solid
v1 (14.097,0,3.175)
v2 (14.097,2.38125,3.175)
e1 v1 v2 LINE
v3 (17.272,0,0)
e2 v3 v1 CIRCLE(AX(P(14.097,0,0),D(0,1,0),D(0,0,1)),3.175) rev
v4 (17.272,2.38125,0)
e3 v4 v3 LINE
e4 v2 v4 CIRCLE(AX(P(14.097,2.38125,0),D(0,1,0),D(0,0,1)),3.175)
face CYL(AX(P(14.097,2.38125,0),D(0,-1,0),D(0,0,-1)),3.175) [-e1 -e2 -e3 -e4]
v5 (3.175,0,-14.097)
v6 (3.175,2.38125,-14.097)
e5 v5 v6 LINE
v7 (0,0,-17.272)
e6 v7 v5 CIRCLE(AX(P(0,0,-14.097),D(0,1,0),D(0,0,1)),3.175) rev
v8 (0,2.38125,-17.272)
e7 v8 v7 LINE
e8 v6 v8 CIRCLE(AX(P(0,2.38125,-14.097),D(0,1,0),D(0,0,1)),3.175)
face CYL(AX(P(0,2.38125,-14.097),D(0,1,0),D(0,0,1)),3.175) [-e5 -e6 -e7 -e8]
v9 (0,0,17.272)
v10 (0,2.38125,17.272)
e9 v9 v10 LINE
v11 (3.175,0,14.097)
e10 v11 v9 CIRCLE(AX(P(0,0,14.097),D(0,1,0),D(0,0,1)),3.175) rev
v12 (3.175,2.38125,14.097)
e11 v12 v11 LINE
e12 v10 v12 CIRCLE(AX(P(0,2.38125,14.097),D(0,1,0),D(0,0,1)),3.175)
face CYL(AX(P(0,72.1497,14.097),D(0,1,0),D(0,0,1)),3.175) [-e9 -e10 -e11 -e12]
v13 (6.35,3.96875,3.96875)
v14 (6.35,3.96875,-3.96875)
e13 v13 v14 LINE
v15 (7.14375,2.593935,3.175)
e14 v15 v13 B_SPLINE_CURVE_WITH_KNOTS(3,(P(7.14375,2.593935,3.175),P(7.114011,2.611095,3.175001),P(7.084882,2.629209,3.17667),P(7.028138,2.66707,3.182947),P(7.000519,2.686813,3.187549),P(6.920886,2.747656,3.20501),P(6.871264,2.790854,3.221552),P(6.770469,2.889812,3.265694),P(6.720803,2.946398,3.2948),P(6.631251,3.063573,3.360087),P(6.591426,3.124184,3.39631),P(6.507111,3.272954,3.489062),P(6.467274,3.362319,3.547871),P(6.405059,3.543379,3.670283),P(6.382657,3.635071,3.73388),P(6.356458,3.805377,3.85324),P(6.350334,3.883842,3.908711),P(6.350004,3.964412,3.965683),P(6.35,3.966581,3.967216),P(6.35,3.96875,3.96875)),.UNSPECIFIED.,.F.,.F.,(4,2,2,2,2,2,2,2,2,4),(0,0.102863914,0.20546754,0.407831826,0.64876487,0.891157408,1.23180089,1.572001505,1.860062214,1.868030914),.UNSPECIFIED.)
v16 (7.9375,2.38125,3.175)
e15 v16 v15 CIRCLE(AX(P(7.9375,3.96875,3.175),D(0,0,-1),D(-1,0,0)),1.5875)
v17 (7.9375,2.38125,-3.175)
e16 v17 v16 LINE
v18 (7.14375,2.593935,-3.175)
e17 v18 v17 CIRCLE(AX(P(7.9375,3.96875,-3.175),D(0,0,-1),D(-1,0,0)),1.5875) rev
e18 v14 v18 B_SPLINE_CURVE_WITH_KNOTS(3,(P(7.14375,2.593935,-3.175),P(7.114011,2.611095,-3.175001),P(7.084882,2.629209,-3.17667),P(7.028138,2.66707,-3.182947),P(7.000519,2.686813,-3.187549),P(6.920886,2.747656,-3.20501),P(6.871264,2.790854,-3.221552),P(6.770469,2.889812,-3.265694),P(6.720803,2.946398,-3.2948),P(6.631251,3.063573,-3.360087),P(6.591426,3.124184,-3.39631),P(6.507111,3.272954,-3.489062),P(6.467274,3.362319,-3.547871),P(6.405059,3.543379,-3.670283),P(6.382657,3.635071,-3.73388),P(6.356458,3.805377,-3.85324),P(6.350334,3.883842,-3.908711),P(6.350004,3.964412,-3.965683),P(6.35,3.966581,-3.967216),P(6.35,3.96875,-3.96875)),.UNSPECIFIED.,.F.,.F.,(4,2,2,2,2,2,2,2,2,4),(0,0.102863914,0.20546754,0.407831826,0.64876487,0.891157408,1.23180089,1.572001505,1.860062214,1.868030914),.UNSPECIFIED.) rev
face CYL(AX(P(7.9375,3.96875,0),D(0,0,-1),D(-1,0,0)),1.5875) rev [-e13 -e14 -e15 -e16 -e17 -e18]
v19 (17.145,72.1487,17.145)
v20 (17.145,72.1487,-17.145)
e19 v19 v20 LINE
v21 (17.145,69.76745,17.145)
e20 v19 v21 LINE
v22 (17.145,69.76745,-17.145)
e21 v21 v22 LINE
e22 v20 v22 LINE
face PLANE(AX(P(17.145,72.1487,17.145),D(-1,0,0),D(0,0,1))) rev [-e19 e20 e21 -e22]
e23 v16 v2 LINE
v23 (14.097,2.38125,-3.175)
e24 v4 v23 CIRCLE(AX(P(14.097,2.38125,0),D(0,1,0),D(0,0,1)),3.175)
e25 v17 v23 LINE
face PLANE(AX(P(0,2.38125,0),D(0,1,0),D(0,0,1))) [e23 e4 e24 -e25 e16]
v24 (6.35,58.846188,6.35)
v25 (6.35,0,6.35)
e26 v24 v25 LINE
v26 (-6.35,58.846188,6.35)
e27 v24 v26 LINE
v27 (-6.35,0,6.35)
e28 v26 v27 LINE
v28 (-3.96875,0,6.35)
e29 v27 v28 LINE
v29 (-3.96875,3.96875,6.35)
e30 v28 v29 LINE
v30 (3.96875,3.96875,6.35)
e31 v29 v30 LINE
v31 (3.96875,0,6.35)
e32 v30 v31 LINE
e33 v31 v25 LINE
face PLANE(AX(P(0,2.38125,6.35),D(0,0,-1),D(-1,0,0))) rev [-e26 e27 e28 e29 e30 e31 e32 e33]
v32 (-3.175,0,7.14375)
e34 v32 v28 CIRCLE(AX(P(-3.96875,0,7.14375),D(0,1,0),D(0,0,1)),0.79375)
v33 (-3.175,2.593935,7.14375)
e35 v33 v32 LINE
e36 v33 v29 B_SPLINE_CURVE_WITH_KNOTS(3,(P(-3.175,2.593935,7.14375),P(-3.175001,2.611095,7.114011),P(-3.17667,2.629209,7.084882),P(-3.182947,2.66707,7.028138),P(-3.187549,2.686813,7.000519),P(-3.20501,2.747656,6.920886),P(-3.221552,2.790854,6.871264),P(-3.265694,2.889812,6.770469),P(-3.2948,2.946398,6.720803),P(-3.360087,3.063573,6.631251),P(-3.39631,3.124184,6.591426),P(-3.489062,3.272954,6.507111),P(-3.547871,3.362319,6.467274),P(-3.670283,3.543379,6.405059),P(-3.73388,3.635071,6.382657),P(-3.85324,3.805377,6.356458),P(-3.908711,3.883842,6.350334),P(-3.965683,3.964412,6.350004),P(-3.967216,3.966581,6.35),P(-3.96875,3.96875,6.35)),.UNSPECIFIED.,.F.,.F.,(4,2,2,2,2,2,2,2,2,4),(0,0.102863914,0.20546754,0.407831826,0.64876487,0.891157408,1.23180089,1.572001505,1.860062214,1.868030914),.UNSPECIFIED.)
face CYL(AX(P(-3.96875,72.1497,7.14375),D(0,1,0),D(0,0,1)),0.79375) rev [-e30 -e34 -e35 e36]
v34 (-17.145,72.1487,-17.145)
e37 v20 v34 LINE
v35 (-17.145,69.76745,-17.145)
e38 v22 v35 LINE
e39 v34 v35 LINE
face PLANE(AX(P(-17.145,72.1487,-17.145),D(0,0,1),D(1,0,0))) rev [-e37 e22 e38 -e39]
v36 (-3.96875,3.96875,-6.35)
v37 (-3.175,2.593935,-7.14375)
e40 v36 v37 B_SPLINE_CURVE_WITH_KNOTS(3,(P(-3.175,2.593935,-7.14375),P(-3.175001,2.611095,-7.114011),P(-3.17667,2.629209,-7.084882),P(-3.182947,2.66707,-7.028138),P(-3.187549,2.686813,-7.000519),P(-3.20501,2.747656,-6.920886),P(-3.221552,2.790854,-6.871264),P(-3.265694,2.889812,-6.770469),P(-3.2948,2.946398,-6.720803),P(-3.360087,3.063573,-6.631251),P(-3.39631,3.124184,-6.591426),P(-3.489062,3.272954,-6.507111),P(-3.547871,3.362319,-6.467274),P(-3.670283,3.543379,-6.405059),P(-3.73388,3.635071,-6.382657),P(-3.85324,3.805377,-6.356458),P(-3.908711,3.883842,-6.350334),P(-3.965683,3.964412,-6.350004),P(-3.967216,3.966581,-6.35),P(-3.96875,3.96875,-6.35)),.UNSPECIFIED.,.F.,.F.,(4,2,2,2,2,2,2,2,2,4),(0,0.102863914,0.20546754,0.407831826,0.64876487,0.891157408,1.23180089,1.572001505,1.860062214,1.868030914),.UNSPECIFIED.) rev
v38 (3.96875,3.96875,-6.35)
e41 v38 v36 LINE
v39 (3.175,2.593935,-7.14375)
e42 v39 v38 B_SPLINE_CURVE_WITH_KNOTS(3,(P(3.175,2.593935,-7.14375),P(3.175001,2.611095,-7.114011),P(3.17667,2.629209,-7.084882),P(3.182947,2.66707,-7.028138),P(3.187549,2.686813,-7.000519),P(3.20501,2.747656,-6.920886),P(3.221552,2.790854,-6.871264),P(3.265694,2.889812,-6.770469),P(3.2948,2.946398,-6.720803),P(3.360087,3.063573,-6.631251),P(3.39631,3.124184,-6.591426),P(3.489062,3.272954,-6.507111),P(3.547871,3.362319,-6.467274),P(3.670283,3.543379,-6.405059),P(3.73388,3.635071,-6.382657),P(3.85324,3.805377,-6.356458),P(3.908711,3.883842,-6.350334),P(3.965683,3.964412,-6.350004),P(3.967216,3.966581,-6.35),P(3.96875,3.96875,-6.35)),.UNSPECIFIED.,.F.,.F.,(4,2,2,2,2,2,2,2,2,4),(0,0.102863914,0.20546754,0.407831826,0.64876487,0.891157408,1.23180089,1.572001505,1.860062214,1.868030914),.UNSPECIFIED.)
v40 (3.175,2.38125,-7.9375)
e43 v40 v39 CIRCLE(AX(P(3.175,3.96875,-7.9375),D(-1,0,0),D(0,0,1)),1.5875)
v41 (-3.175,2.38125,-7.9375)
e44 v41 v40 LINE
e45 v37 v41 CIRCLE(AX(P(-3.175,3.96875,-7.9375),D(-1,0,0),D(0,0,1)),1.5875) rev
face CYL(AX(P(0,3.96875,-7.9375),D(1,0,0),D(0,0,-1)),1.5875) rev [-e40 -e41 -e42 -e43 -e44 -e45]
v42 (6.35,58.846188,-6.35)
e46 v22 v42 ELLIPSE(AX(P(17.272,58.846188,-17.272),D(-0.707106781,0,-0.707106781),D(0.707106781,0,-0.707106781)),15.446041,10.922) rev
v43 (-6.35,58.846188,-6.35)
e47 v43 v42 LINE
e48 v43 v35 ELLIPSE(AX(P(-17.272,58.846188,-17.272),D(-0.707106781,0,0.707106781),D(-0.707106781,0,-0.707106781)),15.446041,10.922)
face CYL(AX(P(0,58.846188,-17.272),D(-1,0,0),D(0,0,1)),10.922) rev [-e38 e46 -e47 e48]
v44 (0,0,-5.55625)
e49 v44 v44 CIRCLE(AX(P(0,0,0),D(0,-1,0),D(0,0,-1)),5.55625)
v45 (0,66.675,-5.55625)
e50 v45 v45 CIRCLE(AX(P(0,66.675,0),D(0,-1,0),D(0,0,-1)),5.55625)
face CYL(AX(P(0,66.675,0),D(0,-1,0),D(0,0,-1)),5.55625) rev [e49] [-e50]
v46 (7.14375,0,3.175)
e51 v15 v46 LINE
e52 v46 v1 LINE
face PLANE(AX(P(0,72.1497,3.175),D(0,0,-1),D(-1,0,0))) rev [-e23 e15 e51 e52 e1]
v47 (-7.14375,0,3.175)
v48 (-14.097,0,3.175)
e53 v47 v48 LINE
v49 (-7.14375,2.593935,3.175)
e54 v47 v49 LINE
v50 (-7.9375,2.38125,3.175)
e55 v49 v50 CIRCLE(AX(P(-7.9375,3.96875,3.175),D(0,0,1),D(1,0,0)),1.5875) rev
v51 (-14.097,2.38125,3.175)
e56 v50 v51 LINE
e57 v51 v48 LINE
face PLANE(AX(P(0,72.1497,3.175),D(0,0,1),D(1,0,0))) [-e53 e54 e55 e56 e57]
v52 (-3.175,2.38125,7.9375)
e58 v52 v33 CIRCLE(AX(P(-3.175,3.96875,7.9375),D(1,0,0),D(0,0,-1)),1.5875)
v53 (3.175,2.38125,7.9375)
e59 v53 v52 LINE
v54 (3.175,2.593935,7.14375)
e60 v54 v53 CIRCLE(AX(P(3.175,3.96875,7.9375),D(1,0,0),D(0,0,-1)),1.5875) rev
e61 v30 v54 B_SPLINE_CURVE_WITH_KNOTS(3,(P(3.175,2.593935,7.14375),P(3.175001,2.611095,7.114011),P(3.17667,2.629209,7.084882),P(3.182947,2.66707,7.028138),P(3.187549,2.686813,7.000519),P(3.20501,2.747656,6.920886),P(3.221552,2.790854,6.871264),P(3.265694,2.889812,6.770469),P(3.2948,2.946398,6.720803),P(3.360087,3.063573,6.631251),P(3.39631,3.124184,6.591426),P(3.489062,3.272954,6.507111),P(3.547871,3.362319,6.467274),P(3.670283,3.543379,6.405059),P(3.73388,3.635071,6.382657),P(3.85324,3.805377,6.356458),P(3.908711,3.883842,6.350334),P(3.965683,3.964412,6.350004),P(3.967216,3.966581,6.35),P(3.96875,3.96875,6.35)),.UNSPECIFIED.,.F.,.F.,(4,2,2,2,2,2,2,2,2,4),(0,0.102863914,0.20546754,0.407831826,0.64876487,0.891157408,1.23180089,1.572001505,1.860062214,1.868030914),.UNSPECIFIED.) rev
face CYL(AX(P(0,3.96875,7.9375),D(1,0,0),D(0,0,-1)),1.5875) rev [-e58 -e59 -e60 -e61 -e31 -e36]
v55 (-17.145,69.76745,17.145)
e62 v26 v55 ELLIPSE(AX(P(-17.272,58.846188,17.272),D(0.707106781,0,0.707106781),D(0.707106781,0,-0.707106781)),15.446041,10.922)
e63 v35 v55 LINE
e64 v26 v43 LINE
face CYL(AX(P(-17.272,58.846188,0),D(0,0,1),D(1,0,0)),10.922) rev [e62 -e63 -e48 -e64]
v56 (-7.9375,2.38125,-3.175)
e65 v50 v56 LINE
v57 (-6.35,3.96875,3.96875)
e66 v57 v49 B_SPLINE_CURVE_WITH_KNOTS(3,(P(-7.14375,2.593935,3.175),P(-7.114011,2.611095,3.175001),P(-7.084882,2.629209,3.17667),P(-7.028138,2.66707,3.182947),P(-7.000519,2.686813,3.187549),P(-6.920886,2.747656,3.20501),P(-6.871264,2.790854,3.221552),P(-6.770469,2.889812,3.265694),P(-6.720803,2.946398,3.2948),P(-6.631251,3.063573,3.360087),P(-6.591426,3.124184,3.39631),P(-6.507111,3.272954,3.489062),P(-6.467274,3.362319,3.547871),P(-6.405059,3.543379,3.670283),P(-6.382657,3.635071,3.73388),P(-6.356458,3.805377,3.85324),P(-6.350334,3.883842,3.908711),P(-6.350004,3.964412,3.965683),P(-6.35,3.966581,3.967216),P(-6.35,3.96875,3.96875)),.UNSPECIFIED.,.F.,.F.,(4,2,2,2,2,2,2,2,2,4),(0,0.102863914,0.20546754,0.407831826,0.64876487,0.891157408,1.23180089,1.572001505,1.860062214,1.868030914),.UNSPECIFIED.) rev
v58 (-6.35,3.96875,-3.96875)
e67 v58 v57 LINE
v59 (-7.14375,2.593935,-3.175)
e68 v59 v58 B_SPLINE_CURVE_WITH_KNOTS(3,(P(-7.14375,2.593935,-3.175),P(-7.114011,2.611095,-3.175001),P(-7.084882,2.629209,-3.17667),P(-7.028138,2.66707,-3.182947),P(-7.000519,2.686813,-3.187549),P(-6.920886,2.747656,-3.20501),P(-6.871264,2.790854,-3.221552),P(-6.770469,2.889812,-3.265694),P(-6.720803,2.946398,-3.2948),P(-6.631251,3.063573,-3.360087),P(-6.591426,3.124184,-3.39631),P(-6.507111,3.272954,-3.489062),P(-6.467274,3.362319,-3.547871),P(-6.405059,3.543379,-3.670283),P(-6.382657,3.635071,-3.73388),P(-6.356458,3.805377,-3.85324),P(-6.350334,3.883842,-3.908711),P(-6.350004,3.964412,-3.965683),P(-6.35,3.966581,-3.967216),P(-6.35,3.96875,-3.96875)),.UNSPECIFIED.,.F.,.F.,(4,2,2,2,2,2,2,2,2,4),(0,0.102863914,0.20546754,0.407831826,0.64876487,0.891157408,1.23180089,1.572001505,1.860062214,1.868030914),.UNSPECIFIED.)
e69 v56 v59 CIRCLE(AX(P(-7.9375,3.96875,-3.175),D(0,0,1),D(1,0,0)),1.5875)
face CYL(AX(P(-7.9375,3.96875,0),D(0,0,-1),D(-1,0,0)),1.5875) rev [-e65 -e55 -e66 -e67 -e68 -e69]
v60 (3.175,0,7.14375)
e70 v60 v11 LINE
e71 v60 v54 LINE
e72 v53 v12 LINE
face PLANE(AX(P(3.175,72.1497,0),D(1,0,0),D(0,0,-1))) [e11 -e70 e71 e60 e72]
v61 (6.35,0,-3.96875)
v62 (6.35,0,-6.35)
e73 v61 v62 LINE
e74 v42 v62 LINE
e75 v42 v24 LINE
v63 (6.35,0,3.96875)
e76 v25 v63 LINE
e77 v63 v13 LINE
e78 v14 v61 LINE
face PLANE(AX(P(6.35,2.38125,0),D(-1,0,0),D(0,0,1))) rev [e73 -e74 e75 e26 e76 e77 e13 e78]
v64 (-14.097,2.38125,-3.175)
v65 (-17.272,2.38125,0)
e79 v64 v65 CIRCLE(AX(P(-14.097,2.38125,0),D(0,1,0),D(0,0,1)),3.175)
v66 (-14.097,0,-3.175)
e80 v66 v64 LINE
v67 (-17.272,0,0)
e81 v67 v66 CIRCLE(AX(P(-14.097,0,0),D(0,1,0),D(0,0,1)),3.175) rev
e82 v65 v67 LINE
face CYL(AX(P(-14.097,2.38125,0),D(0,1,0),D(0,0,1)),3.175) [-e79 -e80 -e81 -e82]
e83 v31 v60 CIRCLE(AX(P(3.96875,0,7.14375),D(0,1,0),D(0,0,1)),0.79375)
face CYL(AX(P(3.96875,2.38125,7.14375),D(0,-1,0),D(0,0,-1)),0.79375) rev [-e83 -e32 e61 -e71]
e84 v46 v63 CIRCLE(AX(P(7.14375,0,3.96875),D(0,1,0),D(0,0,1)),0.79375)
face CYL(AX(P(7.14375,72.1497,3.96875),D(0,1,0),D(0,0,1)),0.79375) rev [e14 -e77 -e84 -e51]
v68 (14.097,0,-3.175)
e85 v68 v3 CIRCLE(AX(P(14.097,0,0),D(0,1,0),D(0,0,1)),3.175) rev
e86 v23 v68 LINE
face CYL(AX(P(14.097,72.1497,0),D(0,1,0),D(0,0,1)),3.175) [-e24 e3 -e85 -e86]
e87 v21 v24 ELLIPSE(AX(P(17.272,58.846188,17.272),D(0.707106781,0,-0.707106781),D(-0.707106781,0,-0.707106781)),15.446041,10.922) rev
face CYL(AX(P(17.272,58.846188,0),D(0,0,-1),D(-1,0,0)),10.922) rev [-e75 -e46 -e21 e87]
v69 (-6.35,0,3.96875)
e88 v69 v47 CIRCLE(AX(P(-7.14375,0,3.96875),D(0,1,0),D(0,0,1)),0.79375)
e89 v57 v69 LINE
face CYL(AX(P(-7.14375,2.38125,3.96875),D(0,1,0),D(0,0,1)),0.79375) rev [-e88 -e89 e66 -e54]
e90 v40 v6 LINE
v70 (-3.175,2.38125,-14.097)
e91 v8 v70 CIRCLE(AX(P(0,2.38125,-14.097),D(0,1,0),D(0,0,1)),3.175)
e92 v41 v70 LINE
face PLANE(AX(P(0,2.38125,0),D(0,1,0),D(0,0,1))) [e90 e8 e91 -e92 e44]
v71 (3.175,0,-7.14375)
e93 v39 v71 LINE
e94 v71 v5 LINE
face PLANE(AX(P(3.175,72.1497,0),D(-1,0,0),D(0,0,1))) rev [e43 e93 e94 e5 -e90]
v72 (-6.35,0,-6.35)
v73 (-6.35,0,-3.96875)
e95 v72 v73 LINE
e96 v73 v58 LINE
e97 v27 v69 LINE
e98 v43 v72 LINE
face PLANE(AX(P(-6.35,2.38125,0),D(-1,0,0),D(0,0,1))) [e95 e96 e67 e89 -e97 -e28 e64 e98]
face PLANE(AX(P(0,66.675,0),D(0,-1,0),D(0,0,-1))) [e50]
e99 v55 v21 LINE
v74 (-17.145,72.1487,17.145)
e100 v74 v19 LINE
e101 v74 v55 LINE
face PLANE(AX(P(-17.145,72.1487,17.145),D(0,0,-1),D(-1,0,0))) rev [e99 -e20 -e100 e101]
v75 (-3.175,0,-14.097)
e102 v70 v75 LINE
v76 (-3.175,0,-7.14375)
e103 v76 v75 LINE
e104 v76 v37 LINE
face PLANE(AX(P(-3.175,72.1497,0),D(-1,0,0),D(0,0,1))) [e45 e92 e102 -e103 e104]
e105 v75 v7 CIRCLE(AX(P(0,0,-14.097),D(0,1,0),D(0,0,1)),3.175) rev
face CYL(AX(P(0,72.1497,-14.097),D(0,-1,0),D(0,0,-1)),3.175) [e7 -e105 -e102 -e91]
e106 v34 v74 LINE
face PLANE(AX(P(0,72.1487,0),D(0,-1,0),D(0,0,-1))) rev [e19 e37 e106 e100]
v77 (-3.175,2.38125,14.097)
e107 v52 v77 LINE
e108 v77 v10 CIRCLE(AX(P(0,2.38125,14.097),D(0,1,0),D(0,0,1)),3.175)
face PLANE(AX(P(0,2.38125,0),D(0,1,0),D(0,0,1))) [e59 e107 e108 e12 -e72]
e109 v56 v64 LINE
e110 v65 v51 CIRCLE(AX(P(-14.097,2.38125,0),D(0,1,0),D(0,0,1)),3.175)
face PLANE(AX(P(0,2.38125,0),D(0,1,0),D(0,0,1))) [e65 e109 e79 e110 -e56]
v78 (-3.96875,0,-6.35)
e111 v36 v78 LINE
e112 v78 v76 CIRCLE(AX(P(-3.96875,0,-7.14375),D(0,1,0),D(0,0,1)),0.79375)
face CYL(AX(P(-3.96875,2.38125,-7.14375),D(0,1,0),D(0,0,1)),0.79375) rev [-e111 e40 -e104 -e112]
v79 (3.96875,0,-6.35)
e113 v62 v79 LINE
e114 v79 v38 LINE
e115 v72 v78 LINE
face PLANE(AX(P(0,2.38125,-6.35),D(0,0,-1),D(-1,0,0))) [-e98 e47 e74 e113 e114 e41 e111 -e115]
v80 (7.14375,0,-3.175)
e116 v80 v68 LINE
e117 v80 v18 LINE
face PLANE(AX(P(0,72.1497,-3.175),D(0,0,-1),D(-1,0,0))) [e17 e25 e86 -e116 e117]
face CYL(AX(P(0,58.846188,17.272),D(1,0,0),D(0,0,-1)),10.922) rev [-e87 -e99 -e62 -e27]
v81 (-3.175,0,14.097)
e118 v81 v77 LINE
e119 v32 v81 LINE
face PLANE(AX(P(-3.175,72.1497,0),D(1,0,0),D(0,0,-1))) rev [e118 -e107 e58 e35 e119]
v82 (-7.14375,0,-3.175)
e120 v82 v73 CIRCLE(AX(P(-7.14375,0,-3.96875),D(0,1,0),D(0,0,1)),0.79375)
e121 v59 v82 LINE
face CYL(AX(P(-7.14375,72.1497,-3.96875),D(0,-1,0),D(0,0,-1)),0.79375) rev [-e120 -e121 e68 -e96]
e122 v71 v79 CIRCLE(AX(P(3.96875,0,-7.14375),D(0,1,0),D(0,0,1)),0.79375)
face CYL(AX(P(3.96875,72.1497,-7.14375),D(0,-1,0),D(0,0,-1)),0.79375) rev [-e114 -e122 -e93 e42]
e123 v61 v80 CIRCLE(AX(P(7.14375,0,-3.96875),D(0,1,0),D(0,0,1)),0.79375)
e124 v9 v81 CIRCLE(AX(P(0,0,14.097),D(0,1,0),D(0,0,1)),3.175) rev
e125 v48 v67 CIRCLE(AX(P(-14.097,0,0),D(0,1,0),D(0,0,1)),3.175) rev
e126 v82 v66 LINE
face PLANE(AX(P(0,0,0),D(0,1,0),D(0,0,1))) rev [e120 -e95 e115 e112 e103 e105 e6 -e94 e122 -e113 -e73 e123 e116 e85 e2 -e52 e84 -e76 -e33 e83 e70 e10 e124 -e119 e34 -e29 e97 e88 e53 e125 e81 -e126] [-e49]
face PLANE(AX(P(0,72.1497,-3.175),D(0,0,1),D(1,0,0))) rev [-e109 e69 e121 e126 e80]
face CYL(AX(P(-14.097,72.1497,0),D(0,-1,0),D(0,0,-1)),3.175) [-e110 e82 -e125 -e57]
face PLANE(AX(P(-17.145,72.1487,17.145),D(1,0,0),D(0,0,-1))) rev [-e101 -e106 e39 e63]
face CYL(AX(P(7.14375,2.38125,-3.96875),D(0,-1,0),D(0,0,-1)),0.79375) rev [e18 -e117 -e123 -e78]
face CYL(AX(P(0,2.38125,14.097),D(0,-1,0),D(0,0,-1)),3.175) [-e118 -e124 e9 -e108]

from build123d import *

# Parameters (mm, degrees)
SKETCH1_W           = 10.922
SKETCH1_H           = 12.7
SKETCH1_W_2         = 12.7
SKETCH1_H_2         = 10.922
BOSS_EXTRUDE1_DEPTH = 2.38125
SKETCH2_W           = 12.7
SKETCH2_H           = 12.7
BOSS_EXTRUDE2_DEPTH = 67.3862
SKETCH3_W           = 34.29
SKETCH3_H           = 34.29
BOSS_EXTRUDE3_DEPTH = 2.38125
FILLET15_R          = 10.922
SKETCH4_R           = 5.55625
CUT_EXTRUDE1_DEPTH  = 66.675
CUT_EXTRUDE2_REACH  = 78.171
SKETCH5_W           = 10.922
SKETCH5_H           = 3.175
SKETCH5_W_2         = 3.175
SKETCH5_H_2         = 10.922
FILLET18_R          = 3.175
FILLET28_R          = 0.79375
FILLET29_R          = 1.5875


# Some blends are built 0.0001 mm under size
with BuildPart() as part:
    # Sketch1 → Boss-Extrude1 (new body)
    with BuildSketch(Plane(origin=(0, 0, 0), x_dir=(1, 0, 0), z_dir=(0, 1, 0))):
        with Locations((-11.811, 0)):
            Rectangle(SKETCH1_W, SKETCH1_H)
        Rectangle(SKETCH1_W_2, SKETCH1_H)
        with Locations((0, 11.811)):
            Rectangle(SKETCH1_W_2, SKETCH1_H_2)
        with Locations((11.811, 0)):
            Rectangle(SKETCH1_W, SKETCH1_H)
        with Locations((0, -11.811)):
            Rectangle(SKETCH1_W_2, SKETCH1_H_2)
    extrude(amount=BOSS_EXTRUDE1_DEPTH)

    # Sketch2 → Boss-Extrude2 (add)
    with BuildSketch(Plane(origin=(0, 2.38125, 0), x_dir=(1, 0, 0), z_dir=(0, 1, 0))):
        Rectangle(SKETCH2_W, SKETCH2_H)
    extrude(amount=BOSS_EXTRUDE2_DEPTH)

    # Sketch3 → Boss-Extrude3 (add)
    with BuildSketch(Plane(origin=(0, 69.76745, 0), x_dir=(1, 0, 0), z_dir=(0, 1, 0))):
        Rectangle(SKETCH3_W, SKETCH3_H)
    extrude(amount=BOSS_EXTRUDE3_DEPTH)

    # Fillet15
    # the kernel refuses this fillet: 10.922 mm, written as the material it adds along each edge
    with BuildSketch(Plane(origin=(6.35, 69.76745, 6.35), x_dir=(1, 0, 0), z_dir=(0, 0, -1))) as fillet15_piece_1_section:
        with BuildLine():
            CenterArc((FILLET15_R, FILLET15_R), FILLET15_R, 180, 90)
            Line((0, FILLET15_R), (0, 0))
            Line((0, 0), (FILLET15_R, 0))
        make_face()
    fillet15_piece_1 = extrude(amount=12.7, mode=Mode.PRIVATE)
    fillet15_piece_1 = split(fillet15_piece_1, bisect_by=Plane(origin=(17.145, 67.292403203, 0), z_dir=(-1, 0, 0)), keep=Keep.TOP, mode=Mode.PRIVATE)
    add(fillet15_piece_1)
    with BuildSketch(Plane(origin=(6.35, 69.76745, -6.35), x_dir=(0, 0, -1), z_dir=(-1, 0, 0))) as fillet15_piece_2_section:
        with BuildLine():
            CenterArc((FILLET15_R, FILLET15_R), FILLET15_R, 180, 90)
            Line((0, FILLET15_R), (0, 0))
            Line((0, 0), (FILLET15_R, 0))
        make_face()
    fillet15_piece_2 = extrude(amount=12.7, mode=Mode.PRIVATE)
    fillet15_piece_2 = split(fillet15_piece_2, bisect_by=Plane(origin=(0, 67.292403203, -17.145), z_dir=(0, 0, 1)), keep=Keep.TOP, mode=Mode.PRIVATE)
    add(fillet15_piece_2)
    with BuildSketch(Plane(origin=(-6.35, 69.76745, -6.35), x_dir=(-1, 0, 0), z_dir=(0, 0, 1))) as fillet15_piece_3_section:
        with BuildLine():
            CenterArc((FILLET15_R, FILLET15_R), FILLET15_R, 180, 90)
            Line((0, FILLET15_R), (0, 0))
            Line((0, 0), (FILLET15_R, 0))
        make_face()
    fillet15_piece_3 = extrude(amount=12.7, mode=Mode.PRIVATE)
    fillet15_piece_3 = split(fillet15_piece_3, bisect_by=Plane(origin=(-17.145, 67.292403203, 0), z_dir=(1, 0, 0)), keep=Keep.TOP, mode=Mode.PRIVATE)
    add(fillet15_piece_3)
    with BuildSketch(Plane(origin=(-6.35, 69.76745, 6.35), x_dir=(0, 0, 1), z_dir=(1, 0, 0))) as fillet15_piece_4_section:
        with BuildLine():
            CenterArc((FILLET15_R, FILLET15_R), FILLET15_R, 180, 90)
            Line((0, FILLET15_R), (0, 0))
            Line((0, 0), (FILLET15_R, 0))
        make_face()
    fillet15_piece_4 = extrude(amount=12.7, mode=Mode.PRIVATE)
    fillet15_piece_4 = split(fillet15_piece_4, bisect_by=Plane(origin=(0, 67.292403203, 17.145), z_dir=(0, 0, -1)), keep=Keep.TOP, mode=Mode.PRIVATE)
    add(fillet15_piece_4)
    with BuildSketch(Plane(origin=(-6.35, 69.76745, 6.35), x_dir=(0, 0, 1), z_dir=(1, 0, 0))) as fillet15_piece_5a_section:
        with BuildLine():
            CenterArc((FILLET15_R, FILLET15_R), FILLET15_R, 180, 90)
            Line((0, FILLET15_R), (0, 0))
            Line((0, 0), (FILLET15_R, 0))
        make_face()
    fillet15_piece_5a = extrude(amount=40.005, mode=Mode.PRIVATE)
    fillet15_piece_5a = split(fillet15_piece_5a, bisect_by=Plane(origin=(11.7475, 67.292403203, 17.145), z_dir=(0, 0, -1)), keep=Keep.TOP, mode=Mode.PRIVATE)
    fillet15_piece_5a = split(fillet15_piece_5a, bisect_by=Plane(origin=(17.145, 67.292403203, 8.815024112), z_dir=(-1, 0, 0)), keep=Keep.TOP, mode=Mode.PRIVATE)
    fillet15_piece_5a = split(fillet15_piece_5a, bisect_by=Plane(origin=(6.35, 67.292403203, 8.815024112), z_dir=(1, 0, 0)), keep=Keep.TOP, mode=Mode.PRIVATE)
    with BuildSketch(Plane(origin=(6.35, 69.76745, 33.655), x_dir=(1, 0, 0), z_dir=(0, 0, -1))) as fillet15_piece_5b_section:
        with BuildLine():
            CenterArc((FILLET15_R, FILLET15_R), FILLET15_R, 180, 90)
            Line((0, FILLET15_R), (0, 0))
            Line((0, 0), (FILLET15_R, 0))
        make_face()
    fillet15_piece_5b = extrude(amount=40.005, mode=Mode.PRIVATE)
    fillet15_piece_5b = split(fillet15_piece_5b, bisect_by=Plane(origin=(8.815024112, 67.292403203, 17.145), z_dir=(0, 0, -1)), keep=Keep.TOP, mode=Mode.PRIVATE)
    fillet15_piece_5b = split(fillet15_piece_5b, bisect_by=Plane(origin=(17.145, 67.292403203, 11.7475), z_dir=(-1, 0, 0)), keep=Keep.TOP, mode=Mode.PRIVATE)
    fillet15_piece_5b = split(fillet15_piece_5b, bisect_by=Plane(origin=(8.815024112, 67.292403203, 6.35), z_dir=(0, 0, 1)), keep=Keep.TOP, mode=Mode.PRIVATE)
    fillet15_piece_5 = fillet15_piece_5a & fillet15_piece_5b
    add(fillet15_piece_5)
    with BuildSketch(Plane(origin=(6.35, 69.76745, 6.35), x_dir=(1, 0, 0), z_dir=(0, 0, -1))) as fillet15_piece_6a_section:
        with BuildLine():
            CenterArc((FILLET15_R, FILLET15_R), FILLET15_R, 180, 90)
            Line((0, FILLET15_R), (0, 0))
            Line((0, 0), (FILLET15_R, 0))
        make_face()
    fillet15_piece_6a = extrude(amount=40.005, mode=Mode.PRIVATE)
    fillet15_piece_6a = split(fillet15_piece_6a, bisect_by=Plane(origin=(17.145, 67.292403203, -11.7475), z_dir=(-1, 0, 0)), keep=Keep.TOP, mode=Mode.PRIVATE)
    fillet15_piece_6a = split(fillet15_piece_6a, bisect_by=Plane(origin=(8.815024112, 67.292403203, -17.145), z_dir=(0, 0, 1)), keep=Keep.TOP, mode=Mode.PRIVATE)
    fillet15_piece_6a = split(fillet15_piece_6a, bisect_by=Plane(origin=(8.815024112, 67.292403203, -6.35), z_dir=(0, 0, -1)), keep=Keep.TOP, mode=Mode.PRIVATE)
    with BuildSketch(Plane(origin=(33.655, 69.76745, -6.35), x_dir=(0, 0, -1), z_dir=(-1, 0, 0))) as fillet15_piece_6b_section:
        with BuildLine():
            CenterArc((FILLET15_R, FILLET15_R), FILLET15_R, 180, 90)
            Line((0, FILLET15_R), (0, 0))
            Line((0, 0), (FILLET15_R, 0))
        make_face()
    fillet15_piece_6b = extrude(amount=40.005, mode=Mode.PRIVATE)
    fillet15_piece_6b = split(fillet15_piece_6b, bisect_by=Plane(origin=(17.145, 67.292403203, -8.815024112), z_dir=(-1, 0, 0)), keep=Keep.TOP, mode=Mode.PRIVATE)
    fillet15_piece_6b = split(fillet15_piece_6b, bisect_by=Plane(origin=(11.7475, 67.292403203, -17.145), z_dir=(0, 0, 1)), keep=Keep.TOP, mode=Mode.PRIVATE)
    fillet15_piece_6b = split(fillet15_piece_6b, bisect_by=Plane(origin=(6.35, 67.292403203, -8.815024112), z_dir=(1, 0, 0)), keep=Keep.TOP, mode=Mode.PRIVATE)
    fillet15_piece_6 = fillet15_piece_6a & fillet15_piece_6b
    add(fillet15_piece_6)
    with BuildSketch(Plane(origin=(-6.35, 69.76745, -33.655), x_dir=(-1, 0, 0), z_dir=(0, 0, 1))) as fillet15_piece_7a_section:
        with BuildLine():
            CenterArc((FILLET15_R, FILLET15_R), FILLET15_R, 180, 90)
            Line((0, FILLET15_R), (0, 0))
            Line((0, 0), (FILLET15_R, 0))
        make_face()
    fillet15_piece_7a = extrude(amount=40.005, mode=Mode.PRIVATE)
    fillet15_piece_7a = split(fillet15_piece_7a, bisect_by=Plane(origin=(-17.145, 67.292403203, -11.7475), z_dir=(1, 0, 0)), keep=Keep.TOP, mode=Mode.PRIVATE)
    fillet15_piece_7a = split(fillet15_piece_7a, bisect_by=Plane(origin=(-8.815024112, 67.292403203, -17.145), z_dir=(0, 0, 1)), keep=Keep.TOP, mode=Mode.PRIVATE)
    fillet15_piece_7a = split(fillet15_piece_7a, bisect_by=Plane(origin=(-8.815024112, 67.292403203, -6.35), z_dir=(0, 0, -1)), keep=Keep.TOP, mode=Mode.PRIVATE)
    with BuildSketch(Plane(origin=(6.35, 69.76745, -6.35), x_dir=(0, 0, -1), z_dir=(-1, 0, 0))) as fillet15_piece_7b_section:
        with BuildLine():
            CenterArc((FILLET15_R, FILLET15_R), FILLET15_R, 180, 90)
            Line((0, FILLET15_R), (0, 0))
            Line((0, 0), (FILLET15_R, 0))
        make_face()
    fillet15_piece_7b = extrude(amount=40.005, mode=Mode.PRIVATE)
    fillet15_piece_7b = split(fillet15_piece_7b, bisect_by=Plane(origin=(-17.145, 67.292403203, -8.815024112), z_dir=(1, 0, 0)), keep=Keep.TOP, mode=Mode.PRIVATE)
    fillet15_piece_7b = split(fillet15_piece_7b, bisect_by=Plane(origin=(-11.7475, 67.292403203, -17.145), z_dir=(0, 0, 1)), keep=Keep.TOP, mode=Mode.PRIVATE)
    fillet15_piece_7b = split(fillet15_piece_7b, bisect_by=Plane(origin=(-6.35, 67.292403203, -8.815024112), z_dir=(-1, 0, 0)), keep=Keep.TOP, mode=Mode.PRIVATE)
    fillet15_piece_7 = fillet15_piece_7a & fillet15_piece_7b
    add(fillet15_piece_7)
    with BuildSketch(Plane(origin=(-6.35, 69.76745, -6.35), x_dir=(-1, 0, 0), z_dir=(0, 0, 1))) as fillet15_piece_8a_section:
        with BuildLine():
            CenterArc((FILLET15_R, FILLET15_R), FILLET15_R, 180, 90)
            Line((0, FILLET15_R), (0, 0))
            Line((0, 0), (FILLET15_R, 0))
        make_face()
    fillet15_piece_8a = extrude(amount=40.005, mode=Mode.PRIVATE)
    fillet15_piece_8a = split(fillet15_piece_8a, bisect_by=Plane(origin=(-8.815024112, 67.292403203, 17.145), z_dir=(0, 0, -1)), keep=Keep.TOP, mode=Mode.PRIVATE)
    fillet15_piece_8a = split(fillet15_piece_8a, bisect_by=Plane(origin=(-17.145, 67.292403203, 11.7475), z_dir=(1, 0, 0)), keep=Keep.TOP, mode=Mode.PRIVATE)
    fillet15_piece_8a = split(fillet15_piece_8a, bisect_by=Plane(origin=(-8.815024112, 67.292403203, 6.35), z_dir=(0, 0, 1)), keep=Keep.TOP, mode=Mode.PRIVATE)
    with BuildSketch(Plane(origin=(-33.655, 69.76745, 6.35), x_dir=(0, 0, 1), z_dir=(1, 0, 0))) as fillet15_piece_8b_section:
        with BuildLine():
            CenterArc((FILLET15_R, FILLET15_R), FILLET15_R, 180, 90)
            Line((0, FILLET15_R), (0, 0))
            Line((0, 0), (FILLET15_R, 0))
        make_face()
    fillet15_piece_8b = extrude(amount=40.005, mode=Mode.PRIVATE)
    fillet15_piece_8b = split(fillet15_piece_8b, bisect_by=Plane(origin=(-11.7475, 67.292403203, 17.145), z_dir=(0, 0, -1)), keep=Keep.TOP, mode=Mode.PRIVATE)
    fillet15_piece_8b = split(fillet15_piece_8b, bisect_by=Plane(origin=(-17.145, 67.292403203, 8.815024112), z_dir=(1, 0, 0)), keep=Keep.TOP, mode=Mode.PRIVATE)
    fillet15_piece_8b = split(fillet15_piece_8b, bisect_by=Plane(origin=(-6.35, 67.292403203, 8.815024112), z_dir=(-1, 0, 0)), keep=Keep.TOP, mode=Mode.PRIVATE)
    fillet15_piece_8 = fillet15_piece_8a & fillet15_piece_8b
    add(fillet15_piece_8)

    # Sketch4 → Cut-Extrude1 (cut)
    with BuildSketch(Plane.XZ):
        with Locations(Location((0, 0, 0), (0, 0, 270))):
            Circle(SKETCH4_R)
    extrude(amount=-CUT_EXTRUDE1_DEPTH, mode=Mode.SUBTRACT)

    # Sketch5 → Cut-Extrude2 (cut, up to next)
    with BuildSketch(Plane.XZ, mode=Mode.PRIVATE) as cut_extrude2_sk1:
        with Locations((-11.811, 4.7625)):
            Rectangle(SKETCH5_W, SKETCH5_H)
    cut_extrude2_tool1 = extrude(cut_extrude2_sk1.sketch, amount=-CUT_EXTRUDE2_REACH, mode=Mode.PRIVATE) & part.part
    # Sketch5 → Cut-Extrude2 (cut, up to next)
    with BuildSketch(Plane.XZ, mode=Mode.PRIVATE) as cut_extrude2_sk2:
        with Locations((-4.7625, 11.811)):
            Rectangle(SKETCH5_W_2, SKETCH5_H_2)
    cut_extrude2_tool2 = extrude(cut_extrude2_sk2.sketch, amount=-CUT_EXTRUDE2_REACH, mode=Mode.PRIVATE) & part.part
    # Sketch5 → Cut-Extrude2 (cut, up to next)
    with BuildSketch(Plane.XZ, mode=Mode.PRIVATE) as cut_extrude2_sk3:
        with Locations((4.7625, 11.811)):
            Rectangle(SKETCH5_W_2, SKETCH5_H_2)
    cut_extrude2_tool3 = extrude(cut_extrude2_sk3.sketch, amount=-CUT_EXTRUDE2_REACH, mode=Mode.PRIVATE) & part.part
    # Sketch5 → Cut-Extrude2 (cut, up to next)
    with BuildSketch(Plane.XZ, mode=Mode.PRIVATE) as cut_extrude2_sk4:
        with Locations((11.811, 4.7625)):
            Rectangle(SKETCH5_W, SKETCH5_H)
    cut_extrude2_tool4 = extrude(cut_extrude2_sk4.sketch, amount=-CUT_EXTRUDE2_REACH, mode=Mode.PRIVATE) & part.part
    # Sketch5 → Cut-Extrude2 (cut, up to next)
    with BuildSketch(Plane.XZ, mode=Mode.PRIVATE) as cut_extrude2_sk5:
        with Locations((11.811, -4.7625)):
            Rectangle(SKETCH5_W, SKETCH5_H)
    cut_extrude2_tool5 = extrude(cut_extrude2_sk5.sketch, amount=-CUT_EXTRUDE2_REACH, mode=Mode.PRIVATE) & part.part
    # Sketch5 → Cut-Extrude2 (cut, up to next)
    with BuildSketch(Plane.XZ, mode=Mode.PRIVATE) as cut_extrude2_sk6:
        with Locations((4.7625, -11.811)):
            Rectangle(SKETCH5_W_2, SKETCH5_H_2)
    cut_extrude2_tool6 = extrude(cut_extrude2_sk6.sketch, amount=-CUT_EXTRUDE2_REACH, mode=Mode.PRIVATE) & part.part
    # Sketch5 → Cut-Extrude2 (cut, up to next)
    with BuildSketch(Plane.XZ, mode=Mode.PRIVATE) as cut_extrude2_sk7:
        with Locations((-4.7625, -11.811)):
            Rectangle(SKETCH5_W_2, SKETCH5_H_2)
    cut_extrude2_tool7 = extrude(cut_extrude2_sk7.sketch, amount=-CUT_EXTRUDE2_REACH, mode=Mode.PRIVATE) & part.part
    # Sketch5 → Cut-Extrude2 (cut, up to next)
    with BuildSketch(Plane.XZ, mode=Mode.PRIVATE) as cut_extrude2_sk8:
        with Locations((-11.811, -4.7625)):
            Rectangle(SKETCH5_W, SKETCH5_H)
    cut_extrude2_tool8 = extrude(cut_extrude2_sk8.sketch, amount=-CUT_EXTRUDE2_REACH, mode=Mode.PRIVATE) & part.part
    add(cut_extrude2_tool1.solids().sort_by_distance((-11.811, 0, 4.7625))[0], mode=Mode.SUBTRACT)
    add(cut_extrude2_tool2.solids().sort_by_distance((-4.7625, 0, 11.811))[0], mode=Mode.SUBTRACT)
    add(cut_extrude2_tool3.solids().sort_by_distance((4.7625, 0, 11.811))[0], mode=Mode.SUBTRACT)
    add(cut_extrude2_tool4.solids().sort_by_distance((11.811, 0, 4.7625))[0], mode=Mode.SUBTRACT)
    add(cut_extrude2_tool5.solids().sort_by_distance((11.811, 0, -4.7625))[0], mode=Mode.SUBTRACT)
    add(cut_extrude2_tool6.solids().sort_by_distance((4.7625, 0, -11.811))[0], mode=Mode.SUBTRACT)
    add(cut_extrude2_tool7.solids().sort_by_distance((-4.7625, 0, -11.811))[0], mode=Mode.SUBTRACT)
    add(cut_extrude2_tool8.solids().sort_by_distance((-11.811, 0, -4.7625))[0], mode=Mode.SUBTRACT)

    # Fillet18
    fillet18_edges = [part.edges().sort_by_distance(p)[0] for p in [
        (-17.272, 1.190625, 3.175),
        (-17.272, 1.190625, -3.175),
        (-3.175, 1.190625, -17.272),
        (3.175, 1.190625, -17.272),
        (17.272, 1.190625, -3.175),
        (17.272, 1.190625, 3.175),
        (-3.175, 1.190625, 17.272),
        (3.175, 1.190625, 17.272),
    ]]
    fillet(fillet18_edges, radius=FILLET18_R - 0.0001)  # a hair under: the kernel refuses the full size

    # Fillet28
    fillet28_edges = [part.edges().sort_by_distance(p)[0] for p in [
        (-3.175, 1.190625, 6.35),
        (3.175, 1.190625, 6.35),
        (6.35, 1.190625, 3.175),
        (6.35, 1.190625, -3.175),
        (3.175, 1.190625, -6.35),
        (-3.175, 1.190625, -6.35),
        (-6.35, 1.190625, -3.175),
        (-6.35, 1.190625, 3.175),
    ]]
    fillet(fillet28_edges, radius=FILLET28_R)

    # Fillet29
    fillet29_edges = [part.edges().sort_by_distance(p)[0] for p in [
        (6.35, 2.38125, 0),
        (0, 2.38125, -6.35),
        (-6.35, 2.38125, 0),
        (0, 2.38125, 6.35),
    ]]
    fillet(fillet29_edges, radius=FILLET29_R)


solid = part.part
